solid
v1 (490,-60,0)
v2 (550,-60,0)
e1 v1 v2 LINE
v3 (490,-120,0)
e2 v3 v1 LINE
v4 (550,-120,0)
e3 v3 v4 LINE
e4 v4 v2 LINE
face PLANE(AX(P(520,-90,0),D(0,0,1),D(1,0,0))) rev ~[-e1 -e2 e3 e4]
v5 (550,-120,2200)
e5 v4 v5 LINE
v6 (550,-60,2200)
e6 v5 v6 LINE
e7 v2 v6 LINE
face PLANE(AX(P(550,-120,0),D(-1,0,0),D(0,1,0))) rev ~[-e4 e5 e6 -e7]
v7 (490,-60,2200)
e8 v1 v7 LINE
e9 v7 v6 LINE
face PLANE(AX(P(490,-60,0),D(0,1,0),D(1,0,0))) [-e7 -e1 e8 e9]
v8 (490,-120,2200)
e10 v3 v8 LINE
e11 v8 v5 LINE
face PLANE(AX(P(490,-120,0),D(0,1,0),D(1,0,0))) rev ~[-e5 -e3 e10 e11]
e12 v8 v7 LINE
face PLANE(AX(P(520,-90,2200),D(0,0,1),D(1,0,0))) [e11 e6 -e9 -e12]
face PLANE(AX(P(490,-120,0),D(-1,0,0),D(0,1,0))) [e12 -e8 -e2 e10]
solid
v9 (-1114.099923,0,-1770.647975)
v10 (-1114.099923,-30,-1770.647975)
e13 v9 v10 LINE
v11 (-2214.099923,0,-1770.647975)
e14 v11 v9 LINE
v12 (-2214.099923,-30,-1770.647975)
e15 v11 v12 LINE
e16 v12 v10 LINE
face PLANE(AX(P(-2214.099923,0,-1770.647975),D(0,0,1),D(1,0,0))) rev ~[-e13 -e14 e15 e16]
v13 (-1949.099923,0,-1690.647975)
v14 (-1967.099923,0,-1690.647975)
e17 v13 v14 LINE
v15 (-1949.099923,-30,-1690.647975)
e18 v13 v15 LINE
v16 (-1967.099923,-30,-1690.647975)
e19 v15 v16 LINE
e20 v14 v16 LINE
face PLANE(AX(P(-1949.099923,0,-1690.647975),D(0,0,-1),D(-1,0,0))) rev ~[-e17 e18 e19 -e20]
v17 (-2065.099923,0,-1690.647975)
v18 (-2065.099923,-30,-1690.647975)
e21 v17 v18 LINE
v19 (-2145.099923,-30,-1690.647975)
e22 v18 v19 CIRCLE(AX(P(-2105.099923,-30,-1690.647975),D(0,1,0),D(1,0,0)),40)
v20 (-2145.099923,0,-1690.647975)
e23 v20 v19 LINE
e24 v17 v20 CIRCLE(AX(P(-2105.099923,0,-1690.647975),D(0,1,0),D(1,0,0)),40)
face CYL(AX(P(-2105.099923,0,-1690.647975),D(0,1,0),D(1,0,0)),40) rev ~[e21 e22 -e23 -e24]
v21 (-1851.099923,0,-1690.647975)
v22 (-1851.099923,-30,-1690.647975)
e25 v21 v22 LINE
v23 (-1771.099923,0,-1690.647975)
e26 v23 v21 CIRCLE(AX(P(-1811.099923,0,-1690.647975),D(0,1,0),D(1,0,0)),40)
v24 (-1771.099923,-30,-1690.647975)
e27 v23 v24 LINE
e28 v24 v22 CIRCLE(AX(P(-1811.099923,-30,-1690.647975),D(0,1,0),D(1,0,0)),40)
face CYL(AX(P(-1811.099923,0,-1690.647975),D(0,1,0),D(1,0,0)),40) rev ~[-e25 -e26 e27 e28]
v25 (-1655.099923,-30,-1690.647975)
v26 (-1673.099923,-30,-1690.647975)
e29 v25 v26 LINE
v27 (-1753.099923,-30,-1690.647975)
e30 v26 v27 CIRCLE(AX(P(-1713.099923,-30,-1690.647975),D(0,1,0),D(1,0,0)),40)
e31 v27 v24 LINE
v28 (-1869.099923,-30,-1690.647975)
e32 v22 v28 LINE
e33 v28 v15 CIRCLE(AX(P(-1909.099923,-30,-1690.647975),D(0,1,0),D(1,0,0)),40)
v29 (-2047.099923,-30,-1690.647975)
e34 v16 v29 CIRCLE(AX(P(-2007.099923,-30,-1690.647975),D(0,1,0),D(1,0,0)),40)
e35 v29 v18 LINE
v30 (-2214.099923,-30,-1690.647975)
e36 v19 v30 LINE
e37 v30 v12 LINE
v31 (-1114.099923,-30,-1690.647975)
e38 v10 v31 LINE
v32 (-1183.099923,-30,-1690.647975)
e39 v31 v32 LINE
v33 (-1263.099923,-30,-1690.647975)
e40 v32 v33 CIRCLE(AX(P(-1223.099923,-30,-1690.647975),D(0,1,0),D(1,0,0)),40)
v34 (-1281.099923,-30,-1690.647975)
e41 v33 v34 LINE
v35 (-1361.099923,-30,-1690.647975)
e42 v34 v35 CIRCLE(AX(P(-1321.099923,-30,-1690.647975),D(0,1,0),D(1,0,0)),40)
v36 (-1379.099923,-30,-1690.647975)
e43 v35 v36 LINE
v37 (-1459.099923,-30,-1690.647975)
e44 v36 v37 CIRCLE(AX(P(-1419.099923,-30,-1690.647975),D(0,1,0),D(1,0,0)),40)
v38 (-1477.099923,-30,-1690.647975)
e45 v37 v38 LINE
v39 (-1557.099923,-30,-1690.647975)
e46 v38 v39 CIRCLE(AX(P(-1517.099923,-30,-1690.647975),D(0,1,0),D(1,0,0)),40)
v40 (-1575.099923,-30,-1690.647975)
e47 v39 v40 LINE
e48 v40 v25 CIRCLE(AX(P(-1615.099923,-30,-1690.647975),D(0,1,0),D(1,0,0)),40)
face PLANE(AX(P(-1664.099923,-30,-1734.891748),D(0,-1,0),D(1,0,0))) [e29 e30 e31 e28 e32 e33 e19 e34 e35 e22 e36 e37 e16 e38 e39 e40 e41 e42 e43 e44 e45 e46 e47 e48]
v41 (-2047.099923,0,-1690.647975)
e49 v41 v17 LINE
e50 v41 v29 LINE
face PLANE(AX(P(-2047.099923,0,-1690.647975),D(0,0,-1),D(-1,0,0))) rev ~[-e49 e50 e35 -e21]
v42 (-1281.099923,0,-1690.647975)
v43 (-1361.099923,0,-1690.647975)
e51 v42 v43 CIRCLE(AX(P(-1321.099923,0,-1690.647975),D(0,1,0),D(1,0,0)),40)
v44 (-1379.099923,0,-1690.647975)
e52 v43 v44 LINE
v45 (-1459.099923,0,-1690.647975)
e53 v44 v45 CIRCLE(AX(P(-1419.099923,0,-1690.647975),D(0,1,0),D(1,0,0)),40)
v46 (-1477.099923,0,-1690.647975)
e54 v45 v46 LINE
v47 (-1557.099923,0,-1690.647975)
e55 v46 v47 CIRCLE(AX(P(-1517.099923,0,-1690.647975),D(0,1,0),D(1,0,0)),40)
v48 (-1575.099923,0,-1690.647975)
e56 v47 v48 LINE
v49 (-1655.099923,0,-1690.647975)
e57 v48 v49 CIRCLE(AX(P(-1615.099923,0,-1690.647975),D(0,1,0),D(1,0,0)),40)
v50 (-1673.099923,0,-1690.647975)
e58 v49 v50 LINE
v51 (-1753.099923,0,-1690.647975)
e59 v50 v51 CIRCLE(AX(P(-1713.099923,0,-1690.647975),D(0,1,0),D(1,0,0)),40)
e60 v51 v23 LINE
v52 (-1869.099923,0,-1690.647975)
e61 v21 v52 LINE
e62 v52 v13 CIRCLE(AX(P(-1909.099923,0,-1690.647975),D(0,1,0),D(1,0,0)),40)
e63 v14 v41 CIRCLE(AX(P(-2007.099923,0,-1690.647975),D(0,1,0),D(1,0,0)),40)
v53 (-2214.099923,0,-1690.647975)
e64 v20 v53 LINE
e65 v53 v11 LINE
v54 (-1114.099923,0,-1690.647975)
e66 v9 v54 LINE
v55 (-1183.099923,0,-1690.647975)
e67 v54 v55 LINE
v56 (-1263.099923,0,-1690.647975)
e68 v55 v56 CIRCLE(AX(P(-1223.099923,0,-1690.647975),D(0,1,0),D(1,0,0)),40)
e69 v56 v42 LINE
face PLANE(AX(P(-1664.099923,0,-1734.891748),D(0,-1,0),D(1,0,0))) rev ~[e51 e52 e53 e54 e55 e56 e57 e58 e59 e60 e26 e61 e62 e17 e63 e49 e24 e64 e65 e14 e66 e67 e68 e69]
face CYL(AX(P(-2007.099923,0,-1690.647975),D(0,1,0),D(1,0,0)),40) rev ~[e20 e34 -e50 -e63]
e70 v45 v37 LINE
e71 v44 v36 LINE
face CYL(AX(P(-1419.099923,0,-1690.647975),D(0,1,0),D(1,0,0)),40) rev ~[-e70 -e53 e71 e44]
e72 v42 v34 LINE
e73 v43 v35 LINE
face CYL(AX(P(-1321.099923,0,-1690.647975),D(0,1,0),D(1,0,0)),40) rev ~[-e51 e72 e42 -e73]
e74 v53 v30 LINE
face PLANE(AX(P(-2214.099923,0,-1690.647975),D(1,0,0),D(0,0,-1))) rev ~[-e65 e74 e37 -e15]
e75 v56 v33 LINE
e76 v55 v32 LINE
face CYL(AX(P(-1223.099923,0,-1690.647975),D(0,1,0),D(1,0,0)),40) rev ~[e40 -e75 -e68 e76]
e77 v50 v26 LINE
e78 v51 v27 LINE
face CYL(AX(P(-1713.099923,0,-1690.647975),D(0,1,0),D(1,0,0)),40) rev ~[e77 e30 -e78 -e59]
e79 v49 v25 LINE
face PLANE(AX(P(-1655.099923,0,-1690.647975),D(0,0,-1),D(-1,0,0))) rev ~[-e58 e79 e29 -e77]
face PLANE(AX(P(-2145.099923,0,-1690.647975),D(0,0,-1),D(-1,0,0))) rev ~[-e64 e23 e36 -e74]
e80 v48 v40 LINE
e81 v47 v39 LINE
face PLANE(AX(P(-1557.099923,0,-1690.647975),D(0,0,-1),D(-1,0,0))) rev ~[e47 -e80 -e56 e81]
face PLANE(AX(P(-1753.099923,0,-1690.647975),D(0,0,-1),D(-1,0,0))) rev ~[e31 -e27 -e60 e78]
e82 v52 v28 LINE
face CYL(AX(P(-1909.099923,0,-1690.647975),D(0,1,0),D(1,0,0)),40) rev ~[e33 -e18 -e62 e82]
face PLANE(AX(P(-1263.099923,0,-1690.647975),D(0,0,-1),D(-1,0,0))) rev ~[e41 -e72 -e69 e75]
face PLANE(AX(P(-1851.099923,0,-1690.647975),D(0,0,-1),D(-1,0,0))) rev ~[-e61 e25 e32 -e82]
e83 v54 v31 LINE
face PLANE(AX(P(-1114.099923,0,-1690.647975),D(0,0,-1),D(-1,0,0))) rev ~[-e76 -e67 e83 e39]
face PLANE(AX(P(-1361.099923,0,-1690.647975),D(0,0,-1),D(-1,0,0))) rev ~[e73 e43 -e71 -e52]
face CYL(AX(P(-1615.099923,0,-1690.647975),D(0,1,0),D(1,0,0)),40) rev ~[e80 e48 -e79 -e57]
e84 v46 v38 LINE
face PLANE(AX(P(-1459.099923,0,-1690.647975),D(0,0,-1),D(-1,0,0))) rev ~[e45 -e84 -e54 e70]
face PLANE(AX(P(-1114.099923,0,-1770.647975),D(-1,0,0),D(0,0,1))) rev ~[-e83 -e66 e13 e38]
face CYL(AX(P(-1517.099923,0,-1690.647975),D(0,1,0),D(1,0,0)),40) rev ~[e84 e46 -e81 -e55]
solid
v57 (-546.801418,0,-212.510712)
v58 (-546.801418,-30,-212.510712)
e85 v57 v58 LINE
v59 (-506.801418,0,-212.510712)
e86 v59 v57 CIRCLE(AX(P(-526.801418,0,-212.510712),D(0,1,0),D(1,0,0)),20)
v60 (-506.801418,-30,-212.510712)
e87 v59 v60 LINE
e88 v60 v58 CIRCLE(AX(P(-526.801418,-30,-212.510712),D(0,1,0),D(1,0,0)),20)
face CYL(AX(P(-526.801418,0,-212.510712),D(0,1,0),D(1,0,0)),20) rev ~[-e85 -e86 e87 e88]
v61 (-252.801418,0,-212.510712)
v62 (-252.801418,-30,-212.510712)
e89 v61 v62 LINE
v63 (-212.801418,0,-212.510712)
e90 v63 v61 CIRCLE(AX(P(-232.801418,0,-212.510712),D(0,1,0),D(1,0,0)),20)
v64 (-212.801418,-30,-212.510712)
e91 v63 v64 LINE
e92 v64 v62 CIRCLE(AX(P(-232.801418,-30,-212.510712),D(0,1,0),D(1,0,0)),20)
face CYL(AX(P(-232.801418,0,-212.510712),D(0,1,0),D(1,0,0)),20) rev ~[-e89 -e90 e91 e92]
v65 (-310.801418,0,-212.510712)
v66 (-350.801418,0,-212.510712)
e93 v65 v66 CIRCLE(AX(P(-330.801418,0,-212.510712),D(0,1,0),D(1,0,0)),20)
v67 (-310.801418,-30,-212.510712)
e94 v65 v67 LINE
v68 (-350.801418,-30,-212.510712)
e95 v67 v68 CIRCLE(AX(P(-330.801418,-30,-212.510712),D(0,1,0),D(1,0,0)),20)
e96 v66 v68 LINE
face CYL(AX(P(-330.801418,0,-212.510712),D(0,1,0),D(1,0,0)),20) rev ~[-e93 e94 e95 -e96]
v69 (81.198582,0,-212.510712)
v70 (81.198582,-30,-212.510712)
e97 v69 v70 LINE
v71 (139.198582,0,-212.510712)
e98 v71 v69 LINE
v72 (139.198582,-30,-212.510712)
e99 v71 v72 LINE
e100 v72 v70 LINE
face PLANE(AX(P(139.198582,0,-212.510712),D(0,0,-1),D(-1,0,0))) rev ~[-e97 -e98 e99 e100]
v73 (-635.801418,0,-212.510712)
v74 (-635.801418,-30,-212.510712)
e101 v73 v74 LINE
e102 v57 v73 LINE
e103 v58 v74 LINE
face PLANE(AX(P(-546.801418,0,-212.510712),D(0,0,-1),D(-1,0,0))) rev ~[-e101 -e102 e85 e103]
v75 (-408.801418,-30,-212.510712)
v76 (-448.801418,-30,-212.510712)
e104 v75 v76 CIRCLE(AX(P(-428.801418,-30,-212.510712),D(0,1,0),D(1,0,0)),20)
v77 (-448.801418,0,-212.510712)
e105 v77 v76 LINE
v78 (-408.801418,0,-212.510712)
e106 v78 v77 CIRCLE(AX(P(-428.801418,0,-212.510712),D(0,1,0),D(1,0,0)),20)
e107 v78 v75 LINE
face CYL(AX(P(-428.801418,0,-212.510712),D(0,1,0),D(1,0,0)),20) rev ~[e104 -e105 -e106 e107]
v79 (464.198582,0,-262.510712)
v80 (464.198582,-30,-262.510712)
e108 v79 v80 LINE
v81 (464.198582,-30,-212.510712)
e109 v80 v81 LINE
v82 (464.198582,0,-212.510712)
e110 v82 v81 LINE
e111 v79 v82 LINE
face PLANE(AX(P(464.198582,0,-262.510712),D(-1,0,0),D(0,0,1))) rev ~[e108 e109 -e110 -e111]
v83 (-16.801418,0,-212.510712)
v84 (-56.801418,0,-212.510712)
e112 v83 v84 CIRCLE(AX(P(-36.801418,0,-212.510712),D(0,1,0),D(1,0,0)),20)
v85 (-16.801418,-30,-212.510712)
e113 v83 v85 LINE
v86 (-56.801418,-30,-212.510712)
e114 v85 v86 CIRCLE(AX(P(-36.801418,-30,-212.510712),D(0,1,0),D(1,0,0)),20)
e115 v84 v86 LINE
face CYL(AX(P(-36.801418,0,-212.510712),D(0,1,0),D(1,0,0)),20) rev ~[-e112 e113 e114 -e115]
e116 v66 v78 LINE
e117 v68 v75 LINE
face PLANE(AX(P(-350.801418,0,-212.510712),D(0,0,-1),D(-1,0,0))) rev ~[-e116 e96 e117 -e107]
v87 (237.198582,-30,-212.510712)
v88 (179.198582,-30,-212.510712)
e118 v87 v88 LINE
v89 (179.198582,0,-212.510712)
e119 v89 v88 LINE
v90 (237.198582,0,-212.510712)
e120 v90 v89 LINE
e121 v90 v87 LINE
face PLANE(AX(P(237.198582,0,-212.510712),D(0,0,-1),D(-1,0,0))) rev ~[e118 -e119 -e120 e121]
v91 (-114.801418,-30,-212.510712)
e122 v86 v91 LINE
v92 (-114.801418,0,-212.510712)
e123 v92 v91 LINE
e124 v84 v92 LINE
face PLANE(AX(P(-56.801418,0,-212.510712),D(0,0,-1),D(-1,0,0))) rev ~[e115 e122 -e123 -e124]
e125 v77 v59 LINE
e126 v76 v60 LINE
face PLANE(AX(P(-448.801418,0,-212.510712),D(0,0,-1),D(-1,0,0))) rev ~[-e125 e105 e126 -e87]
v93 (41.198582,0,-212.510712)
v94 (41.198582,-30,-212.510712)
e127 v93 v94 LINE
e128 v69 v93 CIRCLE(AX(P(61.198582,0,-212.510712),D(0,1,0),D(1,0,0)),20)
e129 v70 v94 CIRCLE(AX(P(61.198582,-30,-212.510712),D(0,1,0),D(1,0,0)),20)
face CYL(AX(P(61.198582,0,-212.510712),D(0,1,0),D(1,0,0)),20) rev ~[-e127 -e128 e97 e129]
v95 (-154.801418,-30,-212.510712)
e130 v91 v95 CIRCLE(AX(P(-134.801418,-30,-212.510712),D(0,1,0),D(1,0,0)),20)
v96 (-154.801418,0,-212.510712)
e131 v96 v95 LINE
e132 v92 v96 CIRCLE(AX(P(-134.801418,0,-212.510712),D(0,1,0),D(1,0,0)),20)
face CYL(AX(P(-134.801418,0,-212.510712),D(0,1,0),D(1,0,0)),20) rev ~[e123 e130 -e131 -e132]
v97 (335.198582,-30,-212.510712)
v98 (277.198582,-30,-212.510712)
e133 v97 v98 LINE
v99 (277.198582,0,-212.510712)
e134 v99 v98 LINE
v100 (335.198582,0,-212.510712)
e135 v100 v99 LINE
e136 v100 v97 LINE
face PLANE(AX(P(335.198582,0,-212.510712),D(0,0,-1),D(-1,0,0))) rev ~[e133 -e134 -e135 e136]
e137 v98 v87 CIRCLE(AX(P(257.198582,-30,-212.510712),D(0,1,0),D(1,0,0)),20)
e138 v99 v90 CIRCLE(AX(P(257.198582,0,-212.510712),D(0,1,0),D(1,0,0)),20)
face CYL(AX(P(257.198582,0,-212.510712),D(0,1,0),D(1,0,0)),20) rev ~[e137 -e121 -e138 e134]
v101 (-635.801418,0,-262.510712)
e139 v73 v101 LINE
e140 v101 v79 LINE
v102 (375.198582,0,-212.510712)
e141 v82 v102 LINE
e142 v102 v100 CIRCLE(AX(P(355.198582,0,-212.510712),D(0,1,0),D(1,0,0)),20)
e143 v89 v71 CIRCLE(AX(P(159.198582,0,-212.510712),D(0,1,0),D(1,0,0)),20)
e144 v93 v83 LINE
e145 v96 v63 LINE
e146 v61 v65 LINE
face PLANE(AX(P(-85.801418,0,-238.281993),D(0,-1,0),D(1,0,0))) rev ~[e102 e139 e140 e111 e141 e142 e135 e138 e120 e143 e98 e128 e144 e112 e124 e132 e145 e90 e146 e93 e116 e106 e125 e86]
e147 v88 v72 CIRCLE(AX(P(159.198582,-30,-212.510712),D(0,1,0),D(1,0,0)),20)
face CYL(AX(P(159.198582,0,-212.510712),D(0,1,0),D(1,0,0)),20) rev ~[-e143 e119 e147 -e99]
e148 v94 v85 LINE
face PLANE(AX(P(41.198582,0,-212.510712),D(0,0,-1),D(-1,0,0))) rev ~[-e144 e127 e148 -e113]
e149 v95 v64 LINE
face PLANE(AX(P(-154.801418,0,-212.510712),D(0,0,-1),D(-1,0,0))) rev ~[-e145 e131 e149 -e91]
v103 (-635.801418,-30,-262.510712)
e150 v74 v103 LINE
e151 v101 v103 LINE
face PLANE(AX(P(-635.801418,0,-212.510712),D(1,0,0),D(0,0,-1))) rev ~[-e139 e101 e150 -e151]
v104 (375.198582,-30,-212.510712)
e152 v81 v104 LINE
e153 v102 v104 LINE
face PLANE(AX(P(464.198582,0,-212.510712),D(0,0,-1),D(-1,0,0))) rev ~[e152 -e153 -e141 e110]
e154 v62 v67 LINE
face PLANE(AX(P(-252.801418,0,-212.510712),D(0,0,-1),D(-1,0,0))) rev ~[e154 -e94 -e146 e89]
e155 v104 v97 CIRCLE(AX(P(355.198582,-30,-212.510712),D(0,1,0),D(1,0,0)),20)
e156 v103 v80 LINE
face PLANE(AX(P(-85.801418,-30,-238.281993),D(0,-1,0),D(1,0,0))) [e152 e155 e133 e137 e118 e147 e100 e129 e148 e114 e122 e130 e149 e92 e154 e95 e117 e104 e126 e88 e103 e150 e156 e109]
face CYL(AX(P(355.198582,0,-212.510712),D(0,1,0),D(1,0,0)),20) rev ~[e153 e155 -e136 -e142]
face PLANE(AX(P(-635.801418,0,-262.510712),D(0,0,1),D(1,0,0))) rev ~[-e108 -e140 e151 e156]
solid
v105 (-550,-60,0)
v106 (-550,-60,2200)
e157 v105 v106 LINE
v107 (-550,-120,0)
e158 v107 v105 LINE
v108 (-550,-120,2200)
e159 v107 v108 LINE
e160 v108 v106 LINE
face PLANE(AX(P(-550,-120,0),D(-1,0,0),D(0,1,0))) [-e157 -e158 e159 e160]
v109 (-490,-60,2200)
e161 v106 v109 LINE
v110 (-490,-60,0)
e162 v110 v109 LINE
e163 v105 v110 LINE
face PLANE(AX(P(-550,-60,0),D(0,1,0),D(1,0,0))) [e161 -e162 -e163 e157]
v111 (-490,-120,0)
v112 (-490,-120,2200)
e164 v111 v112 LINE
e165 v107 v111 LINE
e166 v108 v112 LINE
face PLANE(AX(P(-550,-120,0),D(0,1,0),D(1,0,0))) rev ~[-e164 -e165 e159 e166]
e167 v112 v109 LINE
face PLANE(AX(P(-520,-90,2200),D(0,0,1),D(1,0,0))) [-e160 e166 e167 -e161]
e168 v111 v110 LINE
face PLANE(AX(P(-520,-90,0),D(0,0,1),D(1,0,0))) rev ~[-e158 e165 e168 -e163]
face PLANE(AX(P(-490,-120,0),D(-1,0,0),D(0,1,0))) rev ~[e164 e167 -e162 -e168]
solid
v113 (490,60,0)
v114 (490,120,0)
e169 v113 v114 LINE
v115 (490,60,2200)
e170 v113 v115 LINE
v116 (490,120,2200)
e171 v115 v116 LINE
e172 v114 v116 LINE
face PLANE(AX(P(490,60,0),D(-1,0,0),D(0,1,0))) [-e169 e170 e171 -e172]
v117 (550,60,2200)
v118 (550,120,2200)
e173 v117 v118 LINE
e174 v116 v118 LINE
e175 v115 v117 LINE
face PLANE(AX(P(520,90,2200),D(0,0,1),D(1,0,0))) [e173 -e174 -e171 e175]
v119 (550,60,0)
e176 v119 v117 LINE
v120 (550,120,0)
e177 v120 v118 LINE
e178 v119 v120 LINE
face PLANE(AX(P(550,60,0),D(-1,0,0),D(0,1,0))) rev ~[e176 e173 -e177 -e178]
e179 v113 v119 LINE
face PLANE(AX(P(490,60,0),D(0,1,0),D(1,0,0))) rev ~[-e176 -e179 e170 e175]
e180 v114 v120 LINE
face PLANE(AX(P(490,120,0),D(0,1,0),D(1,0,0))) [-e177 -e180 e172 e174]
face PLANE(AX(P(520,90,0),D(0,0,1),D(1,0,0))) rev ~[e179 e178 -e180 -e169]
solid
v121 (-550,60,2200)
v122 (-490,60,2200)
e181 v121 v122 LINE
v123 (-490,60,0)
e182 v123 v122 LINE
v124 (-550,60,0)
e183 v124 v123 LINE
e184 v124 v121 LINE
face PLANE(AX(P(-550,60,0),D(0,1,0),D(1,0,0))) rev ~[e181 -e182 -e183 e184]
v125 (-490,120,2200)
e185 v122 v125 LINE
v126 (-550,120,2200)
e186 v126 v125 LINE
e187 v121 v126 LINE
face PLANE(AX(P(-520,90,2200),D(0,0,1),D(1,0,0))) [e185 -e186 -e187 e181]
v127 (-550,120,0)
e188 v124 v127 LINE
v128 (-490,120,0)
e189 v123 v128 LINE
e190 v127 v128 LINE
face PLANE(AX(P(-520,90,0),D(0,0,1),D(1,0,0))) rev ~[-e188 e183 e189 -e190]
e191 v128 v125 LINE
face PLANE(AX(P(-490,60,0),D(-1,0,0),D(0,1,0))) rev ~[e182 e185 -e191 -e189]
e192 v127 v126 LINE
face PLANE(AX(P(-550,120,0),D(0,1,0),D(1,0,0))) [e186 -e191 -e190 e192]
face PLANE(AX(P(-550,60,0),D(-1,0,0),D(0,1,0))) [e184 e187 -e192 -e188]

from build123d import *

# Parameters (mm, degrees)
F0_W     = 60
F0_H     = 60
F1_DEPTH = 2200
F3_DEPTH = 30


# Not quite as in the source:
# - a feature names something its author has since deleted; it is built from what else it names


with BuildPart() as f1:
    # F0 (on Top) → F1 (new body)
    with BuildSketch(Plane.XY):
        with Locations((-520, -90)):
            Rectangle(F0_W, F0_H)
    extrude(amount=F1_DEPTH)


with BuildPart() as f1b:
    # F0 (on Top) → F1, piece 2 (new body)
    with BuildSketch(Plane.XY):
        with Locations((520, -90)):
            Rectangle(F0_W, F0_H)
    extrude(amount=F1_DEPTH)


with BuildPart() as f1c:
    # F0 (on Top) → F1, piece 3 (new body)
    with BuildSketch(Plane.XY):
        with Locations((520, 90)):
            Rectangle(F0_W, F0_H)
    extrude(amount=F1_DEPTH)


with BuildPart() as f1d:
    # F0 (on Top) → F1, piece 4 (new body)
    with BuildSketch(Plane.XY):
        with Locations((-520, 90)):
            Rectangle(F0_W, F0_H)
    extrude(amount=F1_DEPTH)


with BuildPart() as f3:
    # F2 (on Front) → F3 (new body)
    with BuildSketch(Plane.XZ):
        with BuildLine():
            Line((464.1985823002, -212.5107118107), (375.1985823002, -212.5107118107))
            ThreePointArc((375.1985823002, -212.5107118107), (355.1985823002, -232.5107118107), (335.1985823002, -212.5107118107))
            Line((335.1985823002, -212.5107118107), (277.1985823002, -212.5107118107))
            ThreePointArc((277.1985823002, -212.5107118107), (257.1985823002, -232.5107118107), (237.1985823002, -212.5107118107))
            Line((237.1985823002, -212.5107118107), (179.1985823002, -212.5107118107))
            ThreePointArc((179.1985823002, -212.5107118107), (159.1985823002, -232.5107118107), (139.1985823002, -212.5107118107))
            Line((139.1985823002, -212.5107118107), (81.1985823002, -212.5107118107))
            ThreePointArc((81.1985823002, -212.5107118107), (61.1985823002, -232.5107118107), (41.1985823002, -212.5107118107))
            Line((41.1985823002, -212.5107118107), (-16.8014176998, -212.5107118107))
            ThreePointArc((-16.8014176998, -212.5107118107), (-36.8014176998, -232.5107118107), (-56.8014176998, -212.5107118107))
            Line((-56.8014176998, -212.5107118107), (-114.8014176998, -212.5107118107))
            ThreePointArc((-114.8014176998, -212.5107118107), (-134.8014176998, -232.5107118107), (-154.8014176998, -212.5107118107))
            Line((-154.8014176998, -212.5107118107), (-212.8014176998, -212.5107118107))
            ThreePointArc((-212.8014176998, -212.5107118107), (-232.8014176998, -232.5107118107), (-252.8014176998, -212.5107118107))
            Line((-252.8014176998, -212.5107118107), (-310.8014176998, -212.5107118107))
            ThreePointArc((-310.8014176998, -212.5107118107), (-330.8014176998, -232.5107118107), (-350.8014176998, -212.5107118107))
            Line((-350.8014176998, -212.5107118107), (-408.8014176998, -212.5107118107))
            ThreePointArc((-408.8014176998, -212.5107118107), (-428.8014176998, -232.5107118107), (-448.8014176998, -212.5107118107))
            Line((-448.8014176998, -212.5107118107), (-506.8014176998, -212.5107118107))
            ThreePointArc((-506.8014176998, -212.5107118107), (-526.8014176998, -232.5107118107), (-546.8014176998, -212.5107118107))
            Line((-546.8014176998, -212.5107118107), (-635.8014176998, -212.5107118107))
            Line((-635.8014176998, -212.5107118107), (-635.8014176998, -262.5107118107))
            Line((-635.8014176998, -262.5107118107), (464.1985823002, -262.5107118107))
            Line((464.1985823002, -262.5107118107), (464.1985823002, -212.5107118107))
        make_face()
    extrude(amount=F3_DEPTH)


with BuildPart() as f3b:
    # F2 (on Front) → F3, piece 2 (new body)
    with BuildSketch(Plane.XZ):
        with BuildLine():
            Line((-1114.0999228668, -1690.6479753494), (-1183.0999228668, -1690.6479753494))
            ThreePointArc((-1183.0999228668, -1690.6479753494), (-1223.0999228668, -1730.6479753494), (-1263.0999228668, -1690.6479753494))
            Line((-1263.0999228668, -1690.6479753494), (-1281.0999228668, -1690.6479753494))
            ThreePointArc((-1281.0999228668, -1690.6479753494), (-1321.0999228668, -1730.6479753494), (-1361.0999228668, -1690.6479753494))
            Line((-1361.0999228668, -1690.6479753494), (-1379.0999228668, -1690.6479753494))
            ThreePointArc((-1379.0999228668, -1690.6479753494), (-1419.0999228668, -1730.6479753494), (-1459.0999228668, -1690.6479753494))
            Line((-1459.0999228668, -1690.6479753494), (-1477.0999228668, -1690.6479753494))
            ThreePointArc((-1477.0999228668, -1690.6479753494), (-1517.0999228668, -1730.6479753494), (-1557.0999228668, -1690.6479753494))
            Line((-1557.0999228668, -1690.6479753494), (-1575.0999228668, -1690.6479753494))
            ThreePointArc((-1575.0999228668, -1690.6479753494), (-1615.0999228668, -1730.6479753494), (-1655.0999228668, -1690.6479753494))
            Line((-1655.0999228668, -1690.6479753494), (-1673.0999228668, -1690.6479753494))
            ThreePointArc((-1673.0999228668, -1690.6479753494), (-1713.0999228668, -1730.6479753494), (-1753.0999228668, -1690.6479753494))
            Line((-1753.0999228668, -1690.6479753494), (-1771.0999228668, -1690.6479753494))
            ThreePointArc((-1771.0999228668, -1690.6479753494), (-1811.0999228668, -1730.6479753494), (-1851.0999228668, -1690.6479753494))
            Line((-1851.0999228668, -1690.6479753494), (-1869.0999228668, -1690.6479753494))
            ThreePointArc((-1869.0999228668, -1690.6479753494), (-1909.0999228668, -1730.6479753494), (-1949.0999228668, -1690.6479753494))
            Line((-1949.0999228668, -1690.6479753494), (-1967.0999228668, -1690.6479753494))
            ThreePointArc((-1967.0999228668, -1690.6479753494), (-2007.0999228668, -1730.6479753494), (-2047.0999228668, -1690.6479753494))
            Line((-2047.0999228668, -1690.6479753494), (-2065.0999228668, -1690.6479753494))
            ThreePointArc((-2065.0999228668, -1690.6479753494), (-2105.0999228668, -1730.6479753494), (-2145.0999228668, -1690.6479753494))
            Line((-2145.0999228668, -1690.6479753494), (-2214.0999228668, -1690.6479753494))
            Line((-2214.0999228668, -1690.6479753494), (-2214.0999228668, -1770.6479753494))
            Line((-2214.0999228668, -1770.6479753494), (-1114.0999228668, -1770.6479753494))
            Line((-1114.0999228668, -1770.6479753494), (-1114.0999228668, -1690.6479753494))
        make_face()
    extrude(amount=F3_DEPTH)


solid = Compound([f1.part, f1b.part, f1c.part, f1d.part, f3.part, f3b.part])
